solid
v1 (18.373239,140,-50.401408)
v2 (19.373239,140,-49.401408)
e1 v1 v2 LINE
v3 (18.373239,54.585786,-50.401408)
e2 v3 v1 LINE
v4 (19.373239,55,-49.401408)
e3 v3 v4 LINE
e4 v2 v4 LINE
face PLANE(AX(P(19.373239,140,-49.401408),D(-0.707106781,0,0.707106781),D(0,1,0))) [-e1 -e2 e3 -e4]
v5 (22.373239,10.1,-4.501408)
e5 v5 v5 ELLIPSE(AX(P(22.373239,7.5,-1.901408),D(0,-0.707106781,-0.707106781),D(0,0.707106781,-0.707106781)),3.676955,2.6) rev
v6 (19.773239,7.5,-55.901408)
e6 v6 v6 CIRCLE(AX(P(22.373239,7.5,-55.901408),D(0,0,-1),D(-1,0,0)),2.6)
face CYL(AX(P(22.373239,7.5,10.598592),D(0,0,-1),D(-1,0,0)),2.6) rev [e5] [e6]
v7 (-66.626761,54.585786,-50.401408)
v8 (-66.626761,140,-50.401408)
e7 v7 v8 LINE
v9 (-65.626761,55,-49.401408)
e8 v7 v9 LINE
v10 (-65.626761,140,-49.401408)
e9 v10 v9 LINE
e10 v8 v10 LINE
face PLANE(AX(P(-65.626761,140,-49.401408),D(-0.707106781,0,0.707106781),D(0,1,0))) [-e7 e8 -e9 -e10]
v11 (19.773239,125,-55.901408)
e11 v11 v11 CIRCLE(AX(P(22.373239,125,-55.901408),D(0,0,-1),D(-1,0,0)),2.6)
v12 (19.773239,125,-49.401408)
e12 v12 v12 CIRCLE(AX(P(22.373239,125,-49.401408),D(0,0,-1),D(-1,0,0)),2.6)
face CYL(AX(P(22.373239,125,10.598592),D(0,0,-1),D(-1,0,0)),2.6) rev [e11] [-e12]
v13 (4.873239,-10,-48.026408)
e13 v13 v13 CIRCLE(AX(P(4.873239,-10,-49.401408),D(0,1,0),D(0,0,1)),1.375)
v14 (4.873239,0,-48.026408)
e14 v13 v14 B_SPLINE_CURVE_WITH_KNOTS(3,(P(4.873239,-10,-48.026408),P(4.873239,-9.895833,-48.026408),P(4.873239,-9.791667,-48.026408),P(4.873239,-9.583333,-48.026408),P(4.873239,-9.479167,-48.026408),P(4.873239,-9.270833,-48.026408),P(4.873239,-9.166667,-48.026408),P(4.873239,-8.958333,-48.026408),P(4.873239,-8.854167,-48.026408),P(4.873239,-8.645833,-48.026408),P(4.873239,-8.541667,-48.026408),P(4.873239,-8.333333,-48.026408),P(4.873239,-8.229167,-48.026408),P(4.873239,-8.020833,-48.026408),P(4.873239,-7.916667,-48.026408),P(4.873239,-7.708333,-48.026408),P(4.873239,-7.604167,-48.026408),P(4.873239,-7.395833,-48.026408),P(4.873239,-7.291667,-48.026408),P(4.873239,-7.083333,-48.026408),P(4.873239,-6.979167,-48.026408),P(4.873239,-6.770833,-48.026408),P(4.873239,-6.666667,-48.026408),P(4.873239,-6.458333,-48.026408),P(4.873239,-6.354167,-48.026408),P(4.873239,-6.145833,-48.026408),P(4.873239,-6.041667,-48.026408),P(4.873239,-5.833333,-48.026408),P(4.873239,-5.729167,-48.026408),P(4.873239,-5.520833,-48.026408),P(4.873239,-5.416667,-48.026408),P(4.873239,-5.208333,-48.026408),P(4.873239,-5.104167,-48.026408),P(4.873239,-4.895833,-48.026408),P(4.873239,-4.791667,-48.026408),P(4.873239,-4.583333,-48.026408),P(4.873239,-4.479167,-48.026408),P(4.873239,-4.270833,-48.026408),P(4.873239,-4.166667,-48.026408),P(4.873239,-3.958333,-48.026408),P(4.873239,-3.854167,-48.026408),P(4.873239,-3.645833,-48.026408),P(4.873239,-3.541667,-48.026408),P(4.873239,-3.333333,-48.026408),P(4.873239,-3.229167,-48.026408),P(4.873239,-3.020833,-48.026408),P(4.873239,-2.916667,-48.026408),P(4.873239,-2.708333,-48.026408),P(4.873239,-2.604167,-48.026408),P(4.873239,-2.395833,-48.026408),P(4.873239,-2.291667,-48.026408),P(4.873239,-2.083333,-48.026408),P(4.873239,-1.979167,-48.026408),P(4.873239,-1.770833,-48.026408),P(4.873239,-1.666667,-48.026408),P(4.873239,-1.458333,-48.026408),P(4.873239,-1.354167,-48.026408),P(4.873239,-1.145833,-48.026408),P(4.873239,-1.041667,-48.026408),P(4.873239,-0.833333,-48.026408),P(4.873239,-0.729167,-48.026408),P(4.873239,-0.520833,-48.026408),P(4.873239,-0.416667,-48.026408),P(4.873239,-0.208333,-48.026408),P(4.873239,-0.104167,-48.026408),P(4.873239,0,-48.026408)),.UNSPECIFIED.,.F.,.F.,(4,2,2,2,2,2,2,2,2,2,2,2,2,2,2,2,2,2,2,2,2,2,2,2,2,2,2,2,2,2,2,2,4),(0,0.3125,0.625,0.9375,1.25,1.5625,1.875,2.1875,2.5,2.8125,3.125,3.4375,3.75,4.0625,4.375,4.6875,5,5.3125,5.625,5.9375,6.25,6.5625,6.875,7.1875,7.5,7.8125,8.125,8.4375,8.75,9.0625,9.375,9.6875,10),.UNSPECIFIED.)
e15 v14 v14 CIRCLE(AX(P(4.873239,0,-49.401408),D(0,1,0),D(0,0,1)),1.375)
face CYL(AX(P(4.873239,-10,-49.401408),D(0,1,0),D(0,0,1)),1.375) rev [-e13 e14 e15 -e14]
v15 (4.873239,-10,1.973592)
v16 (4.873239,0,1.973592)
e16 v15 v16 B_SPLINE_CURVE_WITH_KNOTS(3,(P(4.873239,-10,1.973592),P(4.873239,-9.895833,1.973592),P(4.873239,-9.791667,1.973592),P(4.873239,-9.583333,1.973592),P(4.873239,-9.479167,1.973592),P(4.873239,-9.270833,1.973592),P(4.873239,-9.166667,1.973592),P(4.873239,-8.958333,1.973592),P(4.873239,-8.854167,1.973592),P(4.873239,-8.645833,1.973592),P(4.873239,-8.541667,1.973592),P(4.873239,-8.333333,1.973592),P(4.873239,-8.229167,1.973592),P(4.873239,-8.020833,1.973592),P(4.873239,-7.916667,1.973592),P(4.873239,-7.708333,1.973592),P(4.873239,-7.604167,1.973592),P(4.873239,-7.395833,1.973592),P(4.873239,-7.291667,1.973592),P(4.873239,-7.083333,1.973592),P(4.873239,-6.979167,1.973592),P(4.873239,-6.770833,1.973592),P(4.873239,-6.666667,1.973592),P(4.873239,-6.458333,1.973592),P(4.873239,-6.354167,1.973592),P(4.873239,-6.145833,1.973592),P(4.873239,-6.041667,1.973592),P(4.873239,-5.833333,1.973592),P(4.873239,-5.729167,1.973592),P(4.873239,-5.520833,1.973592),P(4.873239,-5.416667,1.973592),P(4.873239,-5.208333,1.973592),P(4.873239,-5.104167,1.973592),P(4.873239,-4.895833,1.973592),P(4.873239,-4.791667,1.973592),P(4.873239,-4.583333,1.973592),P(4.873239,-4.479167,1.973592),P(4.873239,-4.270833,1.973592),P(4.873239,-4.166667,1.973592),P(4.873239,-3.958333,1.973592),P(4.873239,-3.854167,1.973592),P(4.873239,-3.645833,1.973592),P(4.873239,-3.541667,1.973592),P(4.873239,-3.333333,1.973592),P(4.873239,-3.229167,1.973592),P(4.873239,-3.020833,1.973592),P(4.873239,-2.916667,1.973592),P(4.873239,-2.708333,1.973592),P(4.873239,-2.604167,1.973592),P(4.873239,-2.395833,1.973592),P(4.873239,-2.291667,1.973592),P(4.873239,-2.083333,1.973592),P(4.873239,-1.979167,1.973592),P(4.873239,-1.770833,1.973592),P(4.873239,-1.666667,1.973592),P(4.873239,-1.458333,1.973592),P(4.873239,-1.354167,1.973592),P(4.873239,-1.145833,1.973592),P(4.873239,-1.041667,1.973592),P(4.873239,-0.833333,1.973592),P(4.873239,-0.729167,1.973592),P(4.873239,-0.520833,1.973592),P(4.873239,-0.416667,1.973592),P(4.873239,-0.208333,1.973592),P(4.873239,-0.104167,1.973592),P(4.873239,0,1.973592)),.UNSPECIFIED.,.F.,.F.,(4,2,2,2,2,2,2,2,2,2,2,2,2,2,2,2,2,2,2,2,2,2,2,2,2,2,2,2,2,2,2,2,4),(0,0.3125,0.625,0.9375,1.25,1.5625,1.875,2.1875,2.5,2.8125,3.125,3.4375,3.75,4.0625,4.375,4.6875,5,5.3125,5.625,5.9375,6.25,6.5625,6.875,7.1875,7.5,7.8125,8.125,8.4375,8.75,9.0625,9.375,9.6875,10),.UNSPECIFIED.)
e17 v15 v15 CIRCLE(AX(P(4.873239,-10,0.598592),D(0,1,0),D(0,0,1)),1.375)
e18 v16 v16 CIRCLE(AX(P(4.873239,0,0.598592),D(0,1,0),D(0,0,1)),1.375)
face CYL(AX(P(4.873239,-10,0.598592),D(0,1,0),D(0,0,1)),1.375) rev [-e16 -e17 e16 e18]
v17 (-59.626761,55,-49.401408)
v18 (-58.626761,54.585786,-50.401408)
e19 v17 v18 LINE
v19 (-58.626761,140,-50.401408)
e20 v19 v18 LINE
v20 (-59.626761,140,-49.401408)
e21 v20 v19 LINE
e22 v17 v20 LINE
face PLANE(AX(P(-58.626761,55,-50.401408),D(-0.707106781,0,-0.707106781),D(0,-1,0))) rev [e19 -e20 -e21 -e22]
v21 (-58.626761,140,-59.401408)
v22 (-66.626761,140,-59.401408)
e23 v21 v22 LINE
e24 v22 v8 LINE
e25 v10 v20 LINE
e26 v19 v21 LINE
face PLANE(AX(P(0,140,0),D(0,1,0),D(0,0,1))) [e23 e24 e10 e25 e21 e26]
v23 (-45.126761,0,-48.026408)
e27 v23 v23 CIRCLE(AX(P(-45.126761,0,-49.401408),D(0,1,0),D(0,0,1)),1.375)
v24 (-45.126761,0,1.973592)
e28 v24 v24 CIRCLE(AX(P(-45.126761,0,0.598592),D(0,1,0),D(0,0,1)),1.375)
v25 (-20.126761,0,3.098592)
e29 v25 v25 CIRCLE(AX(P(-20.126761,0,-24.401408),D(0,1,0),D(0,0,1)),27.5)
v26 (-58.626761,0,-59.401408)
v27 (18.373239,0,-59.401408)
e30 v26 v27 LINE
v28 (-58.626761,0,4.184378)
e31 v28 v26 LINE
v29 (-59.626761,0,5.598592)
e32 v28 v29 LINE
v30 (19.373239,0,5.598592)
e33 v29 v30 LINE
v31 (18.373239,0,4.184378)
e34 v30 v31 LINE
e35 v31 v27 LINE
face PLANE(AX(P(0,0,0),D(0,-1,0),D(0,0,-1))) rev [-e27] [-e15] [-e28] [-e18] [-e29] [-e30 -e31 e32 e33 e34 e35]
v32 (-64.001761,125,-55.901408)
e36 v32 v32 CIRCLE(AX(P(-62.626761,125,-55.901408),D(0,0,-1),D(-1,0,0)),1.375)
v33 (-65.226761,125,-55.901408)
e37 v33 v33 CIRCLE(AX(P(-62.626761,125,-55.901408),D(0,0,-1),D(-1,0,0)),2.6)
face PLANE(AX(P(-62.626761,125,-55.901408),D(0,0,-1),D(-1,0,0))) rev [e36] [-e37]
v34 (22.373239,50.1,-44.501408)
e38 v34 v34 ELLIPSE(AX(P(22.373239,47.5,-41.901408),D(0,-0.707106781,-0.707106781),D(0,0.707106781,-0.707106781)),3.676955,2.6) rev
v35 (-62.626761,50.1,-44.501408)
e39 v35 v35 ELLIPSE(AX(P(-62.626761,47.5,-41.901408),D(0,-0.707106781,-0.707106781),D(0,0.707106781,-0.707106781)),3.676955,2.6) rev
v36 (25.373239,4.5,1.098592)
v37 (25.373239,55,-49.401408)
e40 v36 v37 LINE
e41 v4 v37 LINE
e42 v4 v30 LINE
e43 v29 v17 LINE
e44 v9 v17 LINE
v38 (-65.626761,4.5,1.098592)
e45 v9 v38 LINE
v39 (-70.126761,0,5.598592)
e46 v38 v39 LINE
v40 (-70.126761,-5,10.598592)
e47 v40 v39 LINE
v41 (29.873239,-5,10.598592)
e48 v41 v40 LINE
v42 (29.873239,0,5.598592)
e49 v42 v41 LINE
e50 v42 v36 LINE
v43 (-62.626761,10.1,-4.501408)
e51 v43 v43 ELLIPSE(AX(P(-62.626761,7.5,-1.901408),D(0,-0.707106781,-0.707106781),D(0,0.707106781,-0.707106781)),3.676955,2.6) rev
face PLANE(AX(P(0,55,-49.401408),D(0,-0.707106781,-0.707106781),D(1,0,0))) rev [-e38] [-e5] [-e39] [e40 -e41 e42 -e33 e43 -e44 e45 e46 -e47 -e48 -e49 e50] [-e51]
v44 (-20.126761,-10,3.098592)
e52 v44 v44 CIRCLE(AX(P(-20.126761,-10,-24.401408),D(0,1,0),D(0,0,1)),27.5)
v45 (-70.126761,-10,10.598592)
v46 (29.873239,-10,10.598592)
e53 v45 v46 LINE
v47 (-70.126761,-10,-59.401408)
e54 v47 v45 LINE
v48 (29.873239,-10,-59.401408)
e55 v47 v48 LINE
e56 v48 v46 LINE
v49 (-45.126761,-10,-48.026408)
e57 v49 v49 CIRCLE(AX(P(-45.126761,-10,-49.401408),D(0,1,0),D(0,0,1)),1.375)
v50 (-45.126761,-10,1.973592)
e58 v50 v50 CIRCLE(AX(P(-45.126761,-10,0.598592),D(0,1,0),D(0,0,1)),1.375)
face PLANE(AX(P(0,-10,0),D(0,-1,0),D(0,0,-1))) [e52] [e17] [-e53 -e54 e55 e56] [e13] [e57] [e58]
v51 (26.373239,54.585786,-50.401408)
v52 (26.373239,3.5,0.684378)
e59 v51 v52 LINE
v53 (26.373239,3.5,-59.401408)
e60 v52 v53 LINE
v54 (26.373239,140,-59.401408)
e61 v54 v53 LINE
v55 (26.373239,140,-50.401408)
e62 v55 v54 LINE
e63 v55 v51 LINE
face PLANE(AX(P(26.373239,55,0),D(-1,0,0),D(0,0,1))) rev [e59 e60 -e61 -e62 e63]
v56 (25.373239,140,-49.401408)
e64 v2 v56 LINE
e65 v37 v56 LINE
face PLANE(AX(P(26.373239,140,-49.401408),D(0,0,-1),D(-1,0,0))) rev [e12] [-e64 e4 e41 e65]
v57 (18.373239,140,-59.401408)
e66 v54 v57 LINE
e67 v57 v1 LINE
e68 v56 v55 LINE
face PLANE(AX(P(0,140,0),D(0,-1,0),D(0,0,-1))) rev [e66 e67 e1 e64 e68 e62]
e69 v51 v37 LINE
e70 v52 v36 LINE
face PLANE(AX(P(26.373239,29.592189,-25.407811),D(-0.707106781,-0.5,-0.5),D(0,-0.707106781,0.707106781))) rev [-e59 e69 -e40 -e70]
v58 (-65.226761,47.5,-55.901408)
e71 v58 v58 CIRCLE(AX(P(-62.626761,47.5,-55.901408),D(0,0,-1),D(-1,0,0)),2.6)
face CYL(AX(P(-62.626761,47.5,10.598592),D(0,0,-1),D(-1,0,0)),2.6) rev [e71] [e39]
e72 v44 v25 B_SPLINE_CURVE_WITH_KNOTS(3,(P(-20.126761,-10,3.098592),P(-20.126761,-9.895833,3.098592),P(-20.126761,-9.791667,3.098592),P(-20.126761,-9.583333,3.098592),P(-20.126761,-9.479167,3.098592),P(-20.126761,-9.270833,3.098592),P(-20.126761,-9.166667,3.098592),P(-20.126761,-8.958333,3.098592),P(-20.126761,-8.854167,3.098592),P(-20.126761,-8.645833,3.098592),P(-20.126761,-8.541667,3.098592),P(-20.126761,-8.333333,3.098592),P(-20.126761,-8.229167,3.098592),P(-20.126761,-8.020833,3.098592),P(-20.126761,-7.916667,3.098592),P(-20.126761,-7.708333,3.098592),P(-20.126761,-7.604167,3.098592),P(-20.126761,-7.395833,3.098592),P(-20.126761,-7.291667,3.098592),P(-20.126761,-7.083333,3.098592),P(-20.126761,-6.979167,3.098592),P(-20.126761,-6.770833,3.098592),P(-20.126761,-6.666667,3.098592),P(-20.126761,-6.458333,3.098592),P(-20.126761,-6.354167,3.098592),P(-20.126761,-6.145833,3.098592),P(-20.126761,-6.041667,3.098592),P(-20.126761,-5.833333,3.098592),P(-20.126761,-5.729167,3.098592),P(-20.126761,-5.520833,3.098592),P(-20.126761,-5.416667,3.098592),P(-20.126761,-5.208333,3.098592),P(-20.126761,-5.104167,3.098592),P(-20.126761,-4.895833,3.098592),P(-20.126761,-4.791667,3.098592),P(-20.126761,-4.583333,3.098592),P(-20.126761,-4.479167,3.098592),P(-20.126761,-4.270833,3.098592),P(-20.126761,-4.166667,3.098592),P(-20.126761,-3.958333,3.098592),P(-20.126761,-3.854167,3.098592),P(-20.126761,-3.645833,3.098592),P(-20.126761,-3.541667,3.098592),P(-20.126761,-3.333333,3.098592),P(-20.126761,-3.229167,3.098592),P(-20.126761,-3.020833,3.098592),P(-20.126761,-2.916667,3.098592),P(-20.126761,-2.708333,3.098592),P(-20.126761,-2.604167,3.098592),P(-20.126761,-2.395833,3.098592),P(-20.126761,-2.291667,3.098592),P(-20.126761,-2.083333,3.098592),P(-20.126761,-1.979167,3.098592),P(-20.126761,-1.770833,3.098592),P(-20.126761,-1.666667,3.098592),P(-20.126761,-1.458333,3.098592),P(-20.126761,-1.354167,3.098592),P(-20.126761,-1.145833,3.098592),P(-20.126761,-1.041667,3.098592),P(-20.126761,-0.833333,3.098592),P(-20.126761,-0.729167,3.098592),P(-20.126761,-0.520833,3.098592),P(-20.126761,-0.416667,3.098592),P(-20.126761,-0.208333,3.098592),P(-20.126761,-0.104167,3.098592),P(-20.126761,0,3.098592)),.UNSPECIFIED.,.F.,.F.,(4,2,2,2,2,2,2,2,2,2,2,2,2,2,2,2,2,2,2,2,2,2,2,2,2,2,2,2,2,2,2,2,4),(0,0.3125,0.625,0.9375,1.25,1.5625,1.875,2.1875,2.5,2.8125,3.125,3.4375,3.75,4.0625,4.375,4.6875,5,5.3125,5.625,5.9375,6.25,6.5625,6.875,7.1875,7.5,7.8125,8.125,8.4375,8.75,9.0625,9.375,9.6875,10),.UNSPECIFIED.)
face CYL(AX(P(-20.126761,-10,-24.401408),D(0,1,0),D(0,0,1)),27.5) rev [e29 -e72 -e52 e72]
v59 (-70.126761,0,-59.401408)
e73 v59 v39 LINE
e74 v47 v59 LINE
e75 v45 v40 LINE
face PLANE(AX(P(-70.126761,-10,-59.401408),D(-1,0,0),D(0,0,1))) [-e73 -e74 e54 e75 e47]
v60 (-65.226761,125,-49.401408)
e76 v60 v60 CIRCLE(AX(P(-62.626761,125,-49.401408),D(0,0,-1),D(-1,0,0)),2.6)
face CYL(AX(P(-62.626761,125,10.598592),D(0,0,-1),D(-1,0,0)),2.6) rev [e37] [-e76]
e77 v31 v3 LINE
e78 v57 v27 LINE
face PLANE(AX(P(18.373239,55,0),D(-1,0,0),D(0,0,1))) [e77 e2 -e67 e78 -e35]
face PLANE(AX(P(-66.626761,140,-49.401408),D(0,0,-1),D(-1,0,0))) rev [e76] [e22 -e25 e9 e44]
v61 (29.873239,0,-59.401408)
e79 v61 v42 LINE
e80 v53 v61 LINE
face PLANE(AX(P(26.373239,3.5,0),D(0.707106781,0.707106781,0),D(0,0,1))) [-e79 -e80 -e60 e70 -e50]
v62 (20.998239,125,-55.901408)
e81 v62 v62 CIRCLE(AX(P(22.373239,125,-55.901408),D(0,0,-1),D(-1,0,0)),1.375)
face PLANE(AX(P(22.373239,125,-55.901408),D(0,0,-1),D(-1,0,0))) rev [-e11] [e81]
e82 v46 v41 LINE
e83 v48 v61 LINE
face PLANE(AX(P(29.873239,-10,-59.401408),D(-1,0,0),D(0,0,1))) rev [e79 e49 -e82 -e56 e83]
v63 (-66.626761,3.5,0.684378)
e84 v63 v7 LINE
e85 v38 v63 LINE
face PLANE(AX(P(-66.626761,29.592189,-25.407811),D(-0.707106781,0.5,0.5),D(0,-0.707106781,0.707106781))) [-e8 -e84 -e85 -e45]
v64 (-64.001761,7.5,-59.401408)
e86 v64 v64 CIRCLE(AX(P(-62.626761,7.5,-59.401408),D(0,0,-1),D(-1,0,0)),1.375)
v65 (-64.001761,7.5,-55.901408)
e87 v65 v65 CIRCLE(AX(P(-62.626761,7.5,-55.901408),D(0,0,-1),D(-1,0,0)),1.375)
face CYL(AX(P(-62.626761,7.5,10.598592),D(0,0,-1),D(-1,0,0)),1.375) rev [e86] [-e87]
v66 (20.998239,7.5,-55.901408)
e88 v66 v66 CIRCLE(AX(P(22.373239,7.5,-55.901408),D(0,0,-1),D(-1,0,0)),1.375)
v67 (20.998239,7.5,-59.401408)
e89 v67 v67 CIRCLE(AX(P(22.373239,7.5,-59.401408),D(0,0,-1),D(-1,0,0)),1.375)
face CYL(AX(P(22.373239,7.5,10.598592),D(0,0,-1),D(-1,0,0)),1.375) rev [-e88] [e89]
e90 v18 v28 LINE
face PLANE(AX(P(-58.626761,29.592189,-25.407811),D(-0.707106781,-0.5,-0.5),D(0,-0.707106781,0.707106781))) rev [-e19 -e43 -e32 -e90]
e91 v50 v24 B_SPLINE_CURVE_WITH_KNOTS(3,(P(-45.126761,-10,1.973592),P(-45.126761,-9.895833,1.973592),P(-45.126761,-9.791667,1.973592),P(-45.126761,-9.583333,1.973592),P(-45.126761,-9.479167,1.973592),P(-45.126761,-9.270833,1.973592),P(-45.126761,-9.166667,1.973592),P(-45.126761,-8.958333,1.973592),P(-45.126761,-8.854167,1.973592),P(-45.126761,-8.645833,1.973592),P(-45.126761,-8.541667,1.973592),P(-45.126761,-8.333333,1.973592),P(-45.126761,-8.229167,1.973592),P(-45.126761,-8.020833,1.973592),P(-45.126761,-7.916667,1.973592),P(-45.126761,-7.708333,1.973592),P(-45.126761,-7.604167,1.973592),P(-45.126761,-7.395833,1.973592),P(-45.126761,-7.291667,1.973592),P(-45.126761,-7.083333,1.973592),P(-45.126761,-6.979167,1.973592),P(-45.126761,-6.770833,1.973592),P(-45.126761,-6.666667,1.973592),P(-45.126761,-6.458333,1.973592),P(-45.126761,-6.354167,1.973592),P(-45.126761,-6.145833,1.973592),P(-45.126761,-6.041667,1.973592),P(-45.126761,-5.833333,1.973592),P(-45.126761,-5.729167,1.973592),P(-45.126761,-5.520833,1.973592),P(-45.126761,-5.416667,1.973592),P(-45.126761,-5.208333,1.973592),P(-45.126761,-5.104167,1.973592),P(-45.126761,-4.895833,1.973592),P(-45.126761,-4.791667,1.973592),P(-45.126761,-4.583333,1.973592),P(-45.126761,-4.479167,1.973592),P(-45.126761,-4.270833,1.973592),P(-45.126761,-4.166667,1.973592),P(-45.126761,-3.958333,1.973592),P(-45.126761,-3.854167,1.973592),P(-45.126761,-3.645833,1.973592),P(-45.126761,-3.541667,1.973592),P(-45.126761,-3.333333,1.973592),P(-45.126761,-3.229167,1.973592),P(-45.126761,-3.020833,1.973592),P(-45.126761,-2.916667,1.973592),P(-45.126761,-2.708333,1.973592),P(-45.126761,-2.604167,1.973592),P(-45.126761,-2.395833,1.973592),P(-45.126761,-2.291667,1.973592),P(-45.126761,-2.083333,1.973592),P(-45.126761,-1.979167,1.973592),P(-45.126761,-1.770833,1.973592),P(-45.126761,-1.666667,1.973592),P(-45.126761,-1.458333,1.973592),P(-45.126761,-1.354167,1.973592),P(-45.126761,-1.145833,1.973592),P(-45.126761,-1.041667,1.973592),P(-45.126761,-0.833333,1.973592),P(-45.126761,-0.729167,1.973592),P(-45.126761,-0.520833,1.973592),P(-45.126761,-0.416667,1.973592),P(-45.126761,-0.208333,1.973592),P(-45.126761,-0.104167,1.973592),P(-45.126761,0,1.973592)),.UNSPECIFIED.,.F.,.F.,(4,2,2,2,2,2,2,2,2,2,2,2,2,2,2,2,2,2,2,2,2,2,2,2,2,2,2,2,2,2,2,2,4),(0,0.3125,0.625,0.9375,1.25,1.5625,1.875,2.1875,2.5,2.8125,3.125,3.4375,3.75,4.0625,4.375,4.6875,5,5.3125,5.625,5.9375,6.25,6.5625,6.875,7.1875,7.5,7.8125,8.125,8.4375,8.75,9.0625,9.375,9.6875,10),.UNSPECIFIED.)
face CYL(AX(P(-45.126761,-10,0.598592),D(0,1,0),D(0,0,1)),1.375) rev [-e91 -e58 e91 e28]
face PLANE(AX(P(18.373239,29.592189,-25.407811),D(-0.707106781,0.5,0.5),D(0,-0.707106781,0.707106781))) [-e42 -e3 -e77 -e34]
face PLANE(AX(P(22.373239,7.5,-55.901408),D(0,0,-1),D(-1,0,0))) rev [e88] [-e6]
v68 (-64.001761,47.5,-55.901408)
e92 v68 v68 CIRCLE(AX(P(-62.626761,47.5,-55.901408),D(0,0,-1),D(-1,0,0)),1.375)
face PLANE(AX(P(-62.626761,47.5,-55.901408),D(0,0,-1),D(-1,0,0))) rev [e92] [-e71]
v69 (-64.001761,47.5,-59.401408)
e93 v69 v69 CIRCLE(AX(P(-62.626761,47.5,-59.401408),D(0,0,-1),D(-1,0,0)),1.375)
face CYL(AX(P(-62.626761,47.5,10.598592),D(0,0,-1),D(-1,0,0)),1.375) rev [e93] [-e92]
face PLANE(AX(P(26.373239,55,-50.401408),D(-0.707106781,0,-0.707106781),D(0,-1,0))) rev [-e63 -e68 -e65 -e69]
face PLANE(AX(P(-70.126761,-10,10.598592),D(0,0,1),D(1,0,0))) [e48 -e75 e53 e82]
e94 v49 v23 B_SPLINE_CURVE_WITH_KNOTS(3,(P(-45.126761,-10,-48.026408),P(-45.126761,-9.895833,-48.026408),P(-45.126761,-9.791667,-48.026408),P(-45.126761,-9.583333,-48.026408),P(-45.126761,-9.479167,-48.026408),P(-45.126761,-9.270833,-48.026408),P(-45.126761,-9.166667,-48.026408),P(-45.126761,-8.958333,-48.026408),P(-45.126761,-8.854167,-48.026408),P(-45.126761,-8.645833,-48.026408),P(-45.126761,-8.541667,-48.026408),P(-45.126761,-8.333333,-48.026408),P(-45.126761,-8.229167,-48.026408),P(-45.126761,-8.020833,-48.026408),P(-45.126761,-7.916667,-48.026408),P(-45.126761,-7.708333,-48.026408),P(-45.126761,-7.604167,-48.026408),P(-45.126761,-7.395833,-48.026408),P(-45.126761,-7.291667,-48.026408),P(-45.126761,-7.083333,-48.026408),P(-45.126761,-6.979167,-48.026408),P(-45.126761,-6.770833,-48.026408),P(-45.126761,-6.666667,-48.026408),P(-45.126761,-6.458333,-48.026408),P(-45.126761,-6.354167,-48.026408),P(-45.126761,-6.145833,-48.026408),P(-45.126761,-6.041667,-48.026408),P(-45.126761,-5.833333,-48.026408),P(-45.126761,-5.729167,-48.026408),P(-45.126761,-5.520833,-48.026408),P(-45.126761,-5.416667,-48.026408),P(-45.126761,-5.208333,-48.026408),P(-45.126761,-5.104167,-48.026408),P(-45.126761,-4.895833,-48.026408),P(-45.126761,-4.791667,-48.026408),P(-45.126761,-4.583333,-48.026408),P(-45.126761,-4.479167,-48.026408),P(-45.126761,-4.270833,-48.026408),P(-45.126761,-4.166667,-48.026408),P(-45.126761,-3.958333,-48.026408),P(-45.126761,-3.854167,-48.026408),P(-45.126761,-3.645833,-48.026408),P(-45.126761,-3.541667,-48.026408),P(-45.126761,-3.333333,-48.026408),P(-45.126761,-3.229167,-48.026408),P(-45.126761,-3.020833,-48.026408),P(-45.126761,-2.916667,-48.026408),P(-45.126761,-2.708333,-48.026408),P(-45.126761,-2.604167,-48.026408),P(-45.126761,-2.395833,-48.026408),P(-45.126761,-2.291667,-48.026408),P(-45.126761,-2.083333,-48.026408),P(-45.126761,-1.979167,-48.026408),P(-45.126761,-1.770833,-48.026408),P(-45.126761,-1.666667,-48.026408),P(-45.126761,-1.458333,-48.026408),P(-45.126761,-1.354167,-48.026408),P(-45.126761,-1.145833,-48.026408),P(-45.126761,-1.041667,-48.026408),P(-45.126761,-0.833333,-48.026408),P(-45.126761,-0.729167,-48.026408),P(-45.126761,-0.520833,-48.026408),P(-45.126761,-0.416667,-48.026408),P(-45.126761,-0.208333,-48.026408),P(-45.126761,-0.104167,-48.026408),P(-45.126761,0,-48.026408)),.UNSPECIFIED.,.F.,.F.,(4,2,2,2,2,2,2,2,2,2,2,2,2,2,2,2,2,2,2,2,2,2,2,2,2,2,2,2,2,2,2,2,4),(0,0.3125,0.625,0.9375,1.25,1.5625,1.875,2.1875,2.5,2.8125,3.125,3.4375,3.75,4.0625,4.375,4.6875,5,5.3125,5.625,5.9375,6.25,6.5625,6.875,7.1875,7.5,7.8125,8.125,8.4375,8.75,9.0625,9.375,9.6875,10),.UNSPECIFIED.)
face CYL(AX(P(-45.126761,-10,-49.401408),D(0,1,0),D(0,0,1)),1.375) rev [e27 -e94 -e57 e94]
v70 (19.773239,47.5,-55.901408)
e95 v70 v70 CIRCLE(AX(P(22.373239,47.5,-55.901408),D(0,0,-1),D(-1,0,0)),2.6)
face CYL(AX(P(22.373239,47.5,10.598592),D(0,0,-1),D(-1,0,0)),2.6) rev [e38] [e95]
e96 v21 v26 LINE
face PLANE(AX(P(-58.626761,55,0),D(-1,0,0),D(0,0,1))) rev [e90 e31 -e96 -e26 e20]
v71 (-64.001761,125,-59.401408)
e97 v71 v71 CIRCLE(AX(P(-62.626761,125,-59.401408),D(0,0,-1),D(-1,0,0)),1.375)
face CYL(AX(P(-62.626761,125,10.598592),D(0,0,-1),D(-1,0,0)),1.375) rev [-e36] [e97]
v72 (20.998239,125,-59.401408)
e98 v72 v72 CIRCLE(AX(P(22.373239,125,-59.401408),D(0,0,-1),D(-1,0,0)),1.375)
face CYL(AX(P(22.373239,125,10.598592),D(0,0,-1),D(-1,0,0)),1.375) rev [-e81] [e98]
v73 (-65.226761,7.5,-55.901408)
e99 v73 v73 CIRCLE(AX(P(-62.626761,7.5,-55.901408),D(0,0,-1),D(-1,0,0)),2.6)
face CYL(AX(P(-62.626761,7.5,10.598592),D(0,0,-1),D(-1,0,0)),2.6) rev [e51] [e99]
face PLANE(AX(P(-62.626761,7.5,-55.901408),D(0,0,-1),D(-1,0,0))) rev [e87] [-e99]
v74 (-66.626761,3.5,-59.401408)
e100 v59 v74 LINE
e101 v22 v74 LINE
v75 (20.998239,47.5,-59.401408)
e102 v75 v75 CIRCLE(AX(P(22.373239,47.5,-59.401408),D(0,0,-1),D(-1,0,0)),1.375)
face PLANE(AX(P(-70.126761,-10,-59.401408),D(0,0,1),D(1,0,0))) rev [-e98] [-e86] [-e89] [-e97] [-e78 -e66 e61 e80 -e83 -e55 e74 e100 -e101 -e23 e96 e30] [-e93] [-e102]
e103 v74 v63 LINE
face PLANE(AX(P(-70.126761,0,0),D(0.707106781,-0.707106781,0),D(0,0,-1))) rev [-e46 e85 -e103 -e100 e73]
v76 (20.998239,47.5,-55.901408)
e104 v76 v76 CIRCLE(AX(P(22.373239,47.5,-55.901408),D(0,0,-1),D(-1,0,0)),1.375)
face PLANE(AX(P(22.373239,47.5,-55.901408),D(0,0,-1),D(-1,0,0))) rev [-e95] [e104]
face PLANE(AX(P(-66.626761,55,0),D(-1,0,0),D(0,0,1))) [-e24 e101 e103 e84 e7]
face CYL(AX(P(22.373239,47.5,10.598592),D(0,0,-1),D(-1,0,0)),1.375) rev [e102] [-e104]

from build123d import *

# Parameters (mm, degrees)
SKETCH1_W           = 100
SKETCH1_H           = 70
SKETCH1_R           = 1.375
SKETCH1_R_2         = 27.5
BOSS_EXTRUDE1_DEPTH = 10
SKETCH3_W           = 8
SKETCH3_H           = 70
BOSS_EXTRUDE2_DEPTH = 55
CHAMFER1_SIZE       = 60
CHAMFER2_SIZE       = 3.5
SKETCH5_W           = 8
SKETCH5_H           = 10
BOSS_EXTRUDE3_DEPTH = 85
CUT_EXTRUDE1_START  = -3.5
SKETCH4_R           = 2.6
CUT_EXTRUDE1_DEPTH  = 169.016070813
SKETCH4_3_R         = 1.375
CUT_EXTRUDE2_DEPTH  = 172.516070813
CHAMFER3_SIZE       = 1


with BuildPart() as part:
    # Sketch1 → Boss-Extrude1 (new body)
    with BuildSketch(Plane(origin=(0, 0, 0), x_dir=(1, 0, 0), z_dir=(0, 1, 0))):
        with Locations((-20.126760563, 24.401408451)):
            Rectangle(SKETCH1_W, SKETCH1_H)
        with Locations(Location((-45.126760563, 49.401408451, 0), (0, 0, 270))):
            Circle(SKETCH1_R, mode=Mode.SUBTRACT)
        with Locations(Location((4.873239437, 49.401408451, 0), (0, 0, 270))):
            Circle(SKETCH1_R, mode=Mode.SUBTRACT)
        with Locations(Location((4.873239437, -0.598591549, 0), (0, 0, 270))):
            Circle(SKETCH1_R, mode=Mode.SUBTRACT)
        with Locations(Location((-45.126760563, -0.598591549, 0), (0, 0, 270))):
            Circle(SKETCH1_R, mode=Mode.SUBTRACT)
        with Locations(Location((-20.126760563, 24.401408451, 0), (0, 0, 270))):
            Circle(SKETCH1_R_2, mode=Mode.SUBTRACT)
    extrude(amount=-BOSS_EXTRUDE1_DEPTH)

    # Sketch3 → Boss-Extrude2 (add)
    with BuildSketch(Plane(origin=(0, 0, 0), x_dir=(1, 0, 0), z_dir=(0, 1, 0))):
        with Locations((-62.626760563, 24.401408451)):
            Rectangle(SKETCH3_W, SKETCH3_H)
        with Locations((22.373239437, 24.401408451)):
            Rectangle(SKETCH3_W, SKETCH3_H)
    extrude(amount=BOSS_EXTRUDE2_DEPTH)

    # Chamfer1
    chamfer1_edges = [part.edges().sort_by_distance(p)[0] for p in [
        (-62.626760563, 55, 10.598591549),
    ]]
    chamfer(chamfer1_edges, length=CHAMFER1_SIZE)

    # Chamfer2
    chamfer2_edges = [part.edges().sort_by_distance(p)[0] for p in [
        (26.373239437, 0, -26.901408451),
        (-66.626760563, 0, -26.901408451),
    ]]
    chamfer(chamfer2_edges, length=CHAMFER2_SIZE - 0.0001)  # a hair under: the kernel refuses the full size

    # Sketch5 → Boss-Extrude3 (add)
    with BuildSketch(Plane(origin=(0, 55, 0), x_dir=(1, 0, 0), z_dir=(0, 1, 0))):
        with Locations((-62.626760563, 54.401408451)):
            Rectangle(SKETCH5_W, SKETCH5_H)
        with Locations((22.373239437, 54.401408451)):
            Rectangle(SKETCH5_W, SKETCH5_H)
    extrude(amount=BOSS_EXTRUDE3_DEPTH)

    # Sketch4 → Cut-Extrude1 (cut, through all)
    with BuildSketch(Plane(origin=(0, 0, -59.401408451), x_dir=(-1, 0, 0), z_dir=(0, 0, -1)).offset(CUT_EXTRUDE1_START)):
        with Locations((-22.373239437, 47.5)):
            Circle(SKETCH4_R)
        with Locations((62.626760563, 47.5)):
            Circle(SKETCH4_R)
        with Locations((62.626760563, 7.5)):
            Circle(SKETCH4_R)
        with Locations((-22.373239437, 7.5)):
            Circle(SKETCH4_R)
        with Locations((-22.373239437, 125)):
            Circle(SKETCH4_R)
        with Locations((62.626760563, 125)):
            Circle(SKETCH4_R)
    extrude(amount=-CUT_EXTRUDE1_DEPTH, mode=Mode.SUBTRACT)

    # Sketch4<3> → Cut-Extrude2 (cut, through all)
    with BuildSketch(Plane(origin=(0, 0, -59.401408451), x_dir=(-1, 0, 0), z_dir=(0, 0, -1))):
        with Locations((-22.373239437, 47.5)):
            Circle(SKETCH4_3_R)
        with Locations((-22.373239437, 7.5)):
            Circle(SKETCH4_3_R)
        with Locations((62.626760563, 47.5)):
            Circle(SKETCH4_3_R)
        with Locations((62.626760563, 7.5)):
            Circle(SKETCH4_3_R)
        with Locations((-22.373239437, 125)):
            Circle(SKETCH4_3_R)
        with Locations((62.626760563, 125)):
            Circle(SKETCH4_3_R)
    extrude(amount=-CUT_EXTRUDE2_DEPTH, mode=Mode.SUBTRACT)

    # Chamfer3
    chamfer3_edges = [part.edges().sort_by_distance(p)[0] for p in [
        (-66.626760563, 29.24995, -23.651358451),
        (-66.626760563, 97.5, -49.401408451),
        (-58.626760563, 97.5, -49.401408451),
        (26.373239437, 97.5, -49.401408451),
        (18.373239437, 97.5, -49.401408451),
        (26.373239437, 29.24995, -23.651358451),
        (18.373239437, 27.5, -21.901408451),
        (-58.626760563, 27.5, -21.901408451),
    ]]
    chamfer(chamfer3_edges, length=CHAMFER3_SIZE)


solid = part.part
